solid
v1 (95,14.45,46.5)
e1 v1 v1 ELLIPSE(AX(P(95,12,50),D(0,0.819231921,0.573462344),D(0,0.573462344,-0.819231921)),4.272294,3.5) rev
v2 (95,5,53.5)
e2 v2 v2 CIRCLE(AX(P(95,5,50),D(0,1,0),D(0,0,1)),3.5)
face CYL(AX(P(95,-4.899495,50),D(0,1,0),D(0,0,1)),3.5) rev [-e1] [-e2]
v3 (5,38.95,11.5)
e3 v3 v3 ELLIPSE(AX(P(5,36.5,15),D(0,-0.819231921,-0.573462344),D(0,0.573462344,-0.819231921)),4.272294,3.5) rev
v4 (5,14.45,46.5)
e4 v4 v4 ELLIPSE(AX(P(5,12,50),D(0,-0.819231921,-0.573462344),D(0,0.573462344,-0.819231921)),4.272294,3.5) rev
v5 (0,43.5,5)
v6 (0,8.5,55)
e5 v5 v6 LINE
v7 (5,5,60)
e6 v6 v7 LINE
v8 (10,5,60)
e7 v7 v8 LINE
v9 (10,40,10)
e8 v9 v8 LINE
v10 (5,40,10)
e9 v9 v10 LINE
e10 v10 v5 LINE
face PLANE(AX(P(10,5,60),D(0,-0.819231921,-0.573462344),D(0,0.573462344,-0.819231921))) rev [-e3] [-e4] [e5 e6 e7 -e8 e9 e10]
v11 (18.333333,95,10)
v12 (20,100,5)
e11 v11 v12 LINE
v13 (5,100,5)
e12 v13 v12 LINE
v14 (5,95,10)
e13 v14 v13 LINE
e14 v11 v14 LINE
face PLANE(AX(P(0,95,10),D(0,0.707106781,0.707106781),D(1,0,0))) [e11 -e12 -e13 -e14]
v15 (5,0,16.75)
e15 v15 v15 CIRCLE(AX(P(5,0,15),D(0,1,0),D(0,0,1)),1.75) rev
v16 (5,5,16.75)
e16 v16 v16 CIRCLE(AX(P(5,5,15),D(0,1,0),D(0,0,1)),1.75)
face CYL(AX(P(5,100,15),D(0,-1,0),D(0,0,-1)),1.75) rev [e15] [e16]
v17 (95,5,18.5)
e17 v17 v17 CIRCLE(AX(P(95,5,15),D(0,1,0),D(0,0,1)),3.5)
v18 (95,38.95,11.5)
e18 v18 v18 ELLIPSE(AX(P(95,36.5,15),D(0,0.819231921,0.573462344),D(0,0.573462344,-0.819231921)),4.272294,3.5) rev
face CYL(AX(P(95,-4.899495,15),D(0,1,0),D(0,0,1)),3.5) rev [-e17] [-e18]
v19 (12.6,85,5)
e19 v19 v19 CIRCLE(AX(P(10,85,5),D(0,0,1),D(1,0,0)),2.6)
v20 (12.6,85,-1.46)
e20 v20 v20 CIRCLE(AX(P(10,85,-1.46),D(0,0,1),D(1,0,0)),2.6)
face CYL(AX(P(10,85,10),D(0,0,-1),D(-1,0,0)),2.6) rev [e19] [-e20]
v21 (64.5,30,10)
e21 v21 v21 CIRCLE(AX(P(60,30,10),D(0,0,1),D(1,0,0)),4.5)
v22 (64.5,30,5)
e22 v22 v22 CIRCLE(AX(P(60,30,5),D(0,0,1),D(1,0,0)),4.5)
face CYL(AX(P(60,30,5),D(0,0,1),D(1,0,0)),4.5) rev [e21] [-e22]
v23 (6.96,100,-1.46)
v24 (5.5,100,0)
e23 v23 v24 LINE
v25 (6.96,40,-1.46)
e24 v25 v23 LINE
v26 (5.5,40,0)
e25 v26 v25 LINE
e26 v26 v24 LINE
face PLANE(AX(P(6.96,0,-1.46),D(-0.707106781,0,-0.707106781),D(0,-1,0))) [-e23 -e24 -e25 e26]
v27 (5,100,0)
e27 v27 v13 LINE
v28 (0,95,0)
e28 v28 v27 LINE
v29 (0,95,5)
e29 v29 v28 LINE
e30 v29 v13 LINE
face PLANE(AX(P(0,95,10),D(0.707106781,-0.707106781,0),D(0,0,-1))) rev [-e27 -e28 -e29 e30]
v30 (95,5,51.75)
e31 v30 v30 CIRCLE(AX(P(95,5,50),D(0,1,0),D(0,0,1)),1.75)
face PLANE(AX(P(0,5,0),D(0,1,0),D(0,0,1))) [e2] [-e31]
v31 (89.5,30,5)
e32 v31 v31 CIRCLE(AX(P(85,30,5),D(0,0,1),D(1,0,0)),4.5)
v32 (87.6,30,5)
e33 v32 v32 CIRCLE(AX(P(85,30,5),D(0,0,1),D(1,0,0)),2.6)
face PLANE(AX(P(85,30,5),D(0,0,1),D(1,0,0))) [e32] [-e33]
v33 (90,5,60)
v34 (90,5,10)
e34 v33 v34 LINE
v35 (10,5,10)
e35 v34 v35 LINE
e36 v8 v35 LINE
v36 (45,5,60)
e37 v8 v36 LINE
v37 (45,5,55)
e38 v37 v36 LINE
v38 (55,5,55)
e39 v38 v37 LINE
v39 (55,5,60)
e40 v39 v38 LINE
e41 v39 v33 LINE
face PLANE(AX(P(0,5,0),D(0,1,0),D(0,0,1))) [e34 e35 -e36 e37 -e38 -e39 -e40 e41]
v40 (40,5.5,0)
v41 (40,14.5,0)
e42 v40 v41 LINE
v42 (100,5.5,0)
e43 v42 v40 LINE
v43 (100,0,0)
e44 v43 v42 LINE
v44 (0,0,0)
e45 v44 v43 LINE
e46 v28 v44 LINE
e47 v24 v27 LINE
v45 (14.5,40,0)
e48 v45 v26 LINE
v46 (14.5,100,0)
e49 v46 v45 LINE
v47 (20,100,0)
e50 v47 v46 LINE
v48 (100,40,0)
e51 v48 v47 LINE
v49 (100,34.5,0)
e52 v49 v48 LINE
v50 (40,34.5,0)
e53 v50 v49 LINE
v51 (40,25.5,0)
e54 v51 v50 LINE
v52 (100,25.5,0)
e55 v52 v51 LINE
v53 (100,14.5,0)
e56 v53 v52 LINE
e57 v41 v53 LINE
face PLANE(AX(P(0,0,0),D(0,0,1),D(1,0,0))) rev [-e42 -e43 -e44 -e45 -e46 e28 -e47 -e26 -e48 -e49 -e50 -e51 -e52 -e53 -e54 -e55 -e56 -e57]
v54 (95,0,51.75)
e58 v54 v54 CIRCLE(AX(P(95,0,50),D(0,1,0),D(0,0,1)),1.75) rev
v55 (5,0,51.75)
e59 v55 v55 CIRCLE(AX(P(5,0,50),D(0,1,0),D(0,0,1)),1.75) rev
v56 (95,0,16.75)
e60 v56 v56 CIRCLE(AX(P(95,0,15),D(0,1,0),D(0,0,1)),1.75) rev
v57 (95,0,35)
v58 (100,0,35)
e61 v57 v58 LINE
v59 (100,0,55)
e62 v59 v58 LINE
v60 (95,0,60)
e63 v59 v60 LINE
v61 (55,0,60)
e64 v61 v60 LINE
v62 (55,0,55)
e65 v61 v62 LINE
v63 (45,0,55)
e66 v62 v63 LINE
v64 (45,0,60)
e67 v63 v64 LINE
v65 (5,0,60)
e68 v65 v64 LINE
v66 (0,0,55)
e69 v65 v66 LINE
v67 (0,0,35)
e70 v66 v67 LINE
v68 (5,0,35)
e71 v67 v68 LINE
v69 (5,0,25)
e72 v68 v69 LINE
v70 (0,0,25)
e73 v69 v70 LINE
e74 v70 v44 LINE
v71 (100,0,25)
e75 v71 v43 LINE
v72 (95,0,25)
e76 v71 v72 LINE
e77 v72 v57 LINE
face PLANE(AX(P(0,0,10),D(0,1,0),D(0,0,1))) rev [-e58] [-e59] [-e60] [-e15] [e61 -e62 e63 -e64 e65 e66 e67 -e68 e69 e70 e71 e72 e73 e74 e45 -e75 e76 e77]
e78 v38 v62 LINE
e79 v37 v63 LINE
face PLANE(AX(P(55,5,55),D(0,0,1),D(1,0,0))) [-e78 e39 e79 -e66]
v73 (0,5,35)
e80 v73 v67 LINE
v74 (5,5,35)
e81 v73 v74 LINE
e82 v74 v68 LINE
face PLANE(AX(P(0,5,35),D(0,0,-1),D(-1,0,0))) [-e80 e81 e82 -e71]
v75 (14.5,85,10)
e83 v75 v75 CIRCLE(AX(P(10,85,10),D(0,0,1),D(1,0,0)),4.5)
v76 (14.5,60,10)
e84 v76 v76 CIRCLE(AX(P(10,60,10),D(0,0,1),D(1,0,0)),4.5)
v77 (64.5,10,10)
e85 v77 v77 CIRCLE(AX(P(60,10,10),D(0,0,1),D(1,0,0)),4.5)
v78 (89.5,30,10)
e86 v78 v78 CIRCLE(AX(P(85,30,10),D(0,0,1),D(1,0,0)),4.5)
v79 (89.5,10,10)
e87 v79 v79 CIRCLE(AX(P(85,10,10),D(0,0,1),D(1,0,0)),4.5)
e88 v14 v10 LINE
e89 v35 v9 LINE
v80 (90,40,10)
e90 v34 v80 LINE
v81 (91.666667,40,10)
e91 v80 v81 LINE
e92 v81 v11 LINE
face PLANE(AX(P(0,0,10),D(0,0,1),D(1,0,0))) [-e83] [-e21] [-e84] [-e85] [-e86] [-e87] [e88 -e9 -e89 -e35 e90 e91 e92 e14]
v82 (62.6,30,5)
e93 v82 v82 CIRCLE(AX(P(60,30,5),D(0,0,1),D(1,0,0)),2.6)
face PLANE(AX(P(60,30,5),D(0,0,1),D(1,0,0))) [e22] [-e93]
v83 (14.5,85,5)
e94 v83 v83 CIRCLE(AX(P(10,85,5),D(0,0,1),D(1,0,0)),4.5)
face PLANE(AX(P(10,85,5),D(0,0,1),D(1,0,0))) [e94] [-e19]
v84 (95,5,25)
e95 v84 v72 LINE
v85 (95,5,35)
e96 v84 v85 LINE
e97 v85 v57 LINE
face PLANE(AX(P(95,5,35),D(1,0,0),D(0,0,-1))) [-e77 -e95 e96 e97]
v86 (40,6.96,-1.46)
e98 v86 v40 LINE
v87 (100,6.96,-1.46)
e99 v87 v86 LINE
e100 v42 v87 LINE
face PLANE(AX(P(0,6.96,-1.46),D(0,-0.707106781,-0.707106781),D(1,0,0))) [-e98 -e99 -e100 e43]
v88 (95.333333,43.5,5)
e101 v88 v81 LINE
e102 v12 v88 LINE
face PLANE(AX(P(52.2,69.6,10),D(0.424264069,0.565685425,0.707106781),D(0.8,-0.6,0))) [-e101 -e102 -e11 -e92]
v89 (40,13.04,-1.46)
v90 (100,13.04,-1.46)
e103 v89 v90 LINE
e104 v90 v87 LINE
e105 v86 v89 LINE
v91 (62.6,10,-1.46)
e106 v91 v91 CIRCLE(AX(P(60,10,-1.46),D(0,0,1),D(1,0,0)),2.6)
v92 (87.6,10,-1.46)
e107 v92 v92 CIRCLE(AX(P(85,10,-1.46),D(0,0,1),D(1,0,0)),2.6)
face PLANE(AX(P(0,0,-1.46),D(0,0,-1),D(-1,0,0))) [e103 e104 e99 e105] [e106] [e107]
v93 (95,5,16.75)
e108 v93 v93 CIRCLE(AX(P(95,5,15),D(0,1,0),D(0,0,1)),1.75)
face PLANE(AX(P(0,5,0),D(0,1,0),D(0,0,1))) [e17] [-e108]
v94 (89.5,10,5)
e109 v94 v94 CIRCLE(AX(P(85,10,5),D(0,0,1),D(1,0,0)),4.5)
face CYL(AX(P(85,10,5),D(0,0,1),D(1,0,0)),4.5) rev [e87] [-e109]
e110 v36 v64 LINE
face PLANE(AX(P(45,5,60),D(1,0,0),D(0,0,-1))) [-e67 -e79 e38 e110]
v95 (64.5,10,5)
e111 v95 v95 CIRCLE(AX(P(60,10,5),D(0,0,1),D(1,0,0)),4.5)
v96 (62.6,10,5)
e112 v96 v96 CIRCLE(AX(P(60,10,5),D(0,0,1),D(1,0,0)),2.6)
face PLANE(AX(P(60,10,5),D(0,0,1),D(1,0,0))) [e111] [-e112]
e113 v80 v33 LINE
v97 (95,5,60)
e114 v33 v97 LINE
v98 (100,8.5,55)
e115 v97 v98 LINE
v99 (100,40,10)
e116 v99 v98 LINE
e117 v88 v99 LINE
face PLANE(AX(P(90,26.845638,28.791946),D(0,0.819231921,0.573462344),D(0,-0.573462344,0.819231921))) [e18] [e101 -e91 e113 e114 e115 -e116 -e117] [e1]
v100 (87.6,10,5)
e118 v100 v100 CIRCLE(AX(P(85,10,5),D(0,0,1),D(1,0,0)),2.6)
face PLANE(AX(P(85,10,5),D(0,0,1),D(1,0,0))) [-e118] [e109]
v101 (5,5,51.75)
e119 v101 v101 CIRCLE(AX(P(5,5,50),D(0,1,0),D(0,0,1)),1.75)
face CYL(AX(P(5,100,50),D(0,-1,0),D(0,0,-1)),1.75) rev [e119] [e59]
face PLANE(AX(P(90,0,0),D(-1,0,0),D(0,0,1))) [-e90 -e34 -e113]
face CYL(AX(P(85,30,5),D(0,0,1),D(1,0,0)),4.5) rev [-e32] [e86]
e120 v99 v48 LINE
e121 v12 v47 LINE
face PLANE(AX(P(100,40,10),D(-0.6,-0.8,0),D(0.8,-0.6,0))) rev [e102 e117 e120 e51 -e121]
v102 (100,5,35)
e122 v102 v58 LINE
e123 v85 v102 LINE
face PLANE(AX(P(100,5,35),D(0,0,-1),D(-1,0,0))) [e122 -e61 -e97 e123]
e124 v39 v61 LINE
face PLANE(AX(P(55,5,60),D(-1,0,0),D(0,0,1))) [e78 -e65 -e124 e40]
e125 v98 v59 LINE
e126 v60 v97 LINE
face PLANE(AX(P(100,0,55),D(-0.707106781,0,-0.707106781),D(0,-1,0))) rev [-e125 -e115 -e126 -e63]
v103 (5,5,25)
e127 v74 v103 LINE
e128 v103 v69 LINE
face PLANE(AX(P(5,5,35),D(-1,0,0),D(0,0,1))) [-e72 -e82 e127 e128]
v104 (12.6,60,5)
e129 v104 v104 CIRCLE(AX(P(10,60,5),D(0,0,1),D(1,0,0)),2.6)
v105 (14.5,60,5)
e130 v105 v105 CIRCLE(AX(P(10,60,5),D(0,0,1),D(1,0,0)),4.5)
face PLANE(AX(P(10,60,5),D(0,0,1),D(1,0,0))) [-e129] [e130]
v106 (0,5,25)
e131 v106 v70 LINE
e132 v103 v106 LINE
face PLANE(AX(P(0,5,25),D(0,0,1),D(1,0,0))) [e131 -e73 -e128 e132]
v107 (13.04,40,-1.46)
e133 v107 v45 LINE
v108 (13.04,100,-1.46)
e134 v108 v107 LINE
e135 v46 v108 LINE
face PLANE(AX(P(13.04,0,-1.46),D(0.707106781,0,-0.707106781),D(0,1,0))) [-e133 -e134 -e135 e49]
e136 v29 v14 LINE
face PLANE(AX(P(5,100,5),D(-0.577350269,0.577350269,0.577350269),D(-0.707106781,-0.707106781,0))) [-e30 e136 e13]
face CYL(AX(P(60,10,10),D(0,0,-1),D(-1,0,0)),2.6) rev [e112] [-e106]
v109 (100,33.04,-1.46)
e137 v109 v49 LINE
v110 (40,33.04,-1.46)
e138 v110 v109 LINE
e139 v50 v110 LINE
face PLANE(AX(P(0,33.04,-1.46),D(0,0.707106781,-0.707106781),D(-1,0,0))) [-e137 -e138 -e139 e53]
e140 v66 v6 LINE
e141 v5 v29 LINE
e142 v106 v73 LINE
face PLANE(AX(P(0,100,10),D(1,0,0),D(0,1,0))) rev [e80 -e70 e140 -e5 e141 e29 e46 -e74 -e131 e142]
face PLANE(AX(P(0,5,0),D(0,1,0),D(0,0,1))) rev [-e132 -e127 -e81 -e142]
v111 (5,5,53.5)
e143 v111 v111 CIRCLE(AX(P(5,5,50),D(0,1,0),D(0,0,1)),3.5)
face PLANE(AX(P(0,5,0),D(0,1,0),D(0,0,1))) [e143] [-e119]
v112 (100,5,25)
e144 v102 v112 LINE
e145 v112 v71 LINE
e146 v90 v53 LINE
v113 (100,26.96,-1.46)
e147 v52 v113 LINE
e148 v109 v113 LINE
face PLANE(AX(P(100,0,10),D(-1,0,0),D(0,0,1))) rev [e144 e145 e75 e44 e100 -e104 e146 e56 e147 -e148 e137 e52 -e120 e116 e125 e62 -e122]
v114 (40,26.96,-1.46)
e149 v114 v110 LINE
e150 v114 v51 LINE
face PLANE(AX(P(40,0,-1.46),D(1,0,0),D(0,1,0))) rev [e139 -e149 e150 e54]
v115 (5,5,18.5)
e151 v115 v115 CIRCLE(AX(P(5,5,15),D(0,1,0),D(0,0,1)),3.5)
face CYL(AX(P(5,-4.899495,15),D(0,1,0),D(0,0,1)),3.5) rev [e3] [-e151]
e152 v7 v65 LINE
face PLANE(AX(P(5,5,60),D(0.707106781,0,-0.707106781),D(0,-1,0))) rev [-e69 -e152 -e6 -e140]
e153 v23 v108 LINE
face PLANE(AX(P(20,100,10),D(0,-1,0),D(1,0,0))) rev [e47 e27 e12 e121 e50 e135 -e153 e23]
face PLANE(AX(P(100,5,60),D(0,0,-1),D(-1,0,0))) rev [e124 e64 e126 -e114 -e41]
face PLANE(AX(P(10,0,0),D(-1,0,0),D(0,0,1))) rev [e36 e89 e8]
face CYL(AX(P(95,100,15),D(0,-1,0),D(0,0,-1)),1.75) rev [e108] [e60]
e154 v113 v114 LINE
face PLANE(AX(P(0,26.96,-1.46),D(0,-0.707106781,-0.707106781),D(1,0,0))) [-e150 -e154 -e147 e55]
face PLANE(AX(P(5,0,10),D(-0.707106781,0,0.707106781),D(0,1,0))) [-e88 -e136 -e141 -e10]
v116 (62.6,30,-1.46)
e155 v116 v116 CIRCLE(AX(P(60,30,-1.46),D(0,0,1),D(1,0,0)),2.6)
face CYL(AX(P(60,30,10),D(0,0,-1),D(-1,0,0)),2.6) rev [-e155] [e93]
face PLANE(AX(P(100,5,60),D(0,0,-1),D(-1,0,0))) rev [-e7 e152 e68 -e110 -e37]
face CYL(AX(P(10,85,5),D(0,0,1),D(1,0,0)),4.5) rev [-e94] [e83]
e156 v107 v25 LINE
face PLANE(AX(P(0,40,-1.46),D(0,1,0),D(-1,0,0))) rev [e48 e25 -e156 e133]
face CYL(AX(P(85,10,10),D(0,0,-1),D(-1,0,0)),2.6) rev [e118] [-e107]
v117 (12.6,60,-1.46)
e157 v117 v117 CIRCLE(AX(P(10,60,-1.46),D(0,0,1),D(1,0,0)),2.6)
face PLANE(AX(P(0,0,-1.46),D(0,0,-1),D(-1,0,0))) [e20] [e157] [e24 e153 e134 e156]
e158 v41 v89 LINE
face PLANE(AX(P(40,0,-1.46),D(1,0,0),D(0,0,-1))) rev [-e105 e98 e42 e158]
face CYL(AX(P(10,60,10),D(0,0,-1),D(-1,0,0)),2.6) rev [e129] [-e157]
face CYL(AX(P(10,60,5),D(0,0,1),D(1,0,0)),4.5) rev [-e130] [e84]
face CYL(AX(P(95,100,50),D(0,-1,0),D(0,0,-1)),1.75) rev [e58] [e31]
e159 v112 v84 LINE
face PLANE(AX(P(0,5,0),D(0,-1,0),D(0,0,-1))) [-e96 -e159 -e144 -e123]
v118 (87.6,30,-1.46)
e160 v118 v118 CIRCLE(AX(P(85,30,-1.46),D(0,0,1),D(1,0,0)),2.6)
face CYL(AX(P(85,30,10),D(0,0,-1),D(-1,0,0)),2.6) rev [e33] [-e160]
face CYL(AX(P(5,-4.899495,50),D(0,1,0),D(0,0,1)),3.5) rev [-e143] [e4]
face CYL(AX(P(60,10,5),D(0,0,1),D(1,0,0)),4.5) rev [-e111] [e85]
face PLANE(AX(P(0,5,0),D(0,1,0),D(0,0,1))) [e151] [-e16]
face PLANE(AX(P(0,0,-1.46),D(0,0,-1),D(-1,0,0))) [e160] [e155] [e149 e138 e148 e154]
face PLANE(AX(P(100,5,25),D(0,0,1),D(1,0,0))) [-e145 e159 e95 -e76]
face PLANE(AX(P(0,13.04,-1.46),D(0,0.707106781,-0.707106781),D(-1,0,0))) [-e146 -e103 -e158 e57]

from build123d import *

# Parameters (mm, degrees)
BOSS_EXTRUDE1_DEPTH     = 10
SKETCH2_R               = 2.6
CUT_EXTRUDE1_DEPTH      = 142.774468788
SKETCH3_W               = 60
SKETCH3_H               = 9
SKETCH3_W_2             = 9
SKETCH3_H_2             = 60
BOSS_EXTRUDE3_DEPTH     = 1.46
CUT_EXTRUDE2_DEPTH      = 142.774468788
CUT_EXTRUDE2_DEPTH_BACK = 142.774468788
SKETCH2_2_R             = 2.6
CHAMFER1_SIZE           = 1.46
CUT_EXTRUDE3_START      = 10
SKETCH4_R               = 4.5
CUT_EXTRUDE3_DEPTH      = 5
SKETCH5_W               = 100
SKETCH5_H               = 50
BOSS_EXTRUDE4_DEPTH     = 5
BOSS_EXTRUDE5_DEPTH     = 10
BOSS_EXTRUDE6_START     = 100
BOSS_EXTRUDE6_DEPTH     = 10
CUT_EXTRUDE4_DEPTH      = 154.622914957
CUT_EXTRUDE4_DEPTH_BACK = 154.622914957
SKETCH10_R              = 1.75
CUT_EXTRUDE5_START      = 100
SKETCH11_R              = 3.5
CUT_EXTRUDE5_DEPTH      = 95
SKETCH12_W              = 10
SKETCH12_H              = 5
SKETCH12_W_2            = 5
SKETCH12_H_2            = 10
CUT_EXTRUDE6_DEPTH      = 5
CHAMFER2_SIZE           = 5


# Some blends are built 0.0001 mm under size
with BuildPart() as part:
    # Sketch1 → Boss-Extrude1 (new body)
    with BuildSketch(Plane.XY):
        Polygon((0, 0), (100, 0), (100, 40), (20, 100), (0, 100), align=None)
    extrude(amount=BOSS_EXTRUDE1_DEPTH)

    # Sketch2 → Cut-Extrude1 (cut, through all)
    with BuildSketch(Plane.XY):
        with Locations((10, 85)):
            Circle(SKETCH2_R)
        with Locations((10, 60)):
            Circle(SKETCH2_R)
        with Locations((85, 30)):
            Circle(SKETCH2_R)
        with Locations((85, 10)):
            Circle(SKETCH2_R)
        with Locations((60, 10)):
            Circle(SKETCH2_R)
        with Locations((60, 30)):
            Circle(SKETCH2_R)
    extrude(amount=CUT_EXTRUDE1_DEPTH, mode=Mode.SUBTRACT)

    # Sketch3 → Boss-Extrude3 (add)
    with BuildSketch(Plane.XY):
        with Locations((70, 30)):
            Rectangle(SKETCH3_W, SKETCH3_H)
        with Locations((70, 10)):
            Rectangle(SKETCH3_W, SKETCH3_H)
        with Locations((10, 70)):
            Rectangle(SKETCH3_W_2, SKETCH3_H_2)
    extrude(amount=-BOSS_EXTRUDE3_DEPTH)

    # Sketch2<2> → Cut-Extrude2 (cut, two sides: drawn at the far end of the back side and taken through both)
    with BuildSketch(Plane.XY.offset(-CUT_EXTRUDE2_DEPTH_BACK)):
        with Locations((10, 85)):
            Circle(SKETCH2_2_R)
        with Locations((10, 60)):
            Circle(SKETCH2_2_R)
        with Locations((85, 30)):
            Circle(SKETCH2_2_R)
        with Locations((85, 10)):
            Circle(SKETCH2_2_R)
        with Locations((60, 10)):
            Circle(SKETCH2_2_R)
        with Locations((60, 30)):
            Circle(SKETCH2_2_R)
    extrude(amount=CUT_EXTRUDE2_DEPTH + CUT_EXTRUDE2_DEPTH_BACK, mode=Mode.SUBTRACT)

    # Chamfer1
    chamfer1_edges = [part.edges().sort_by_distance(p)[0] for p in [
        (14.5, 70, -1.46),
        (5.5, 70, -1.46),
        (70, 5.5, -1.46),
        (70, 14.5, -1.46),
        (70, 25.5, -1.46),
        (70, 34.5, -1.46),
    ]]
    chamfer(chamfer1_edges, length=CHAMFER1_SIZE - 0.0001)  # a hair under: the kernel refuses the full size

    # Sketch4 → Cut-Extrude3 (cut)
    with BuildSketch(Plane.XY.offset(CUT_EXTRUDE3_START)):
        with Locations((10, 85)):
            Circle(SKETCH4_R)
        with Locations((10, 60)):
            Circle(SKETCH4_R)
        with Locations((60, 30)):
            Circle(SKETCH4_R)
        with Locations((85, 30)):
            Circle(SKETCH4_R)
        with Locations((85, 10)):
            Circle(SKETCH4_R)
        with Locations((60, 10)):
            Circle(SKETCH4_R)
    extrude(amount=-CUT_EXTRUDE3_DEPTH, mode=Mode.SUBTRACT)

    # Sketch5 → Boss-Extrude4 (add)
    with BuildSketch(Plane(origin=(0, 0, 0), x_dir=(1, 0, 0), z_dir=(0, 1, 0))):
        with Locations((50, -35)):
            Rectangle(SKETCH5_W, SKETCH5_H)
    extrude(amount=BOSS_EXTRUDE4_DEPTH)

    # Sketch8 → Boss-Extrude5 (add)
    with BuildSketch(Plane(origin=(0, 0, 0), x_dir=(0, 0, -1), z_dir=(1, 0, 0))):
        Polygon((-10, 5), (-60, 5), (-10, 40), align=None)
    extrude(amount=BOSS_EXTRUDE5_DEPTH)

    # Sketch8<2> → Boss-Extrude6 (add)
    with BuildSketch(Plane(origin=(0, 0, 0), x_dir=(0, 0, -1), z_dir=(1, 0, 0)).offset(BOSS_EXTRUDE6_START)):
        Polygon((-10, 5), (-60, 5), (-10, 40), align=None)
    extrude(amount=-BOSS_EXTRUDE6_DEPTH)

    # Sketch10 → Cut-Extrude4 (cut, two sides: drawn at the far end of the back side and taken through both)
    with BuildSketch(Plane(origin=(0, 0, 0), x_dir=(1, 0, 0), z_dir=(0, 1, 0)).offset(-CUT_EXTRUDE4_DEPTH_BACK)):
        with Locations(Location((5, -50, 0), (0, 0, 270))):
            Circle(SKETCH10_R)
        with Locations(Location((95, -50, 0), (0, 0, 270))):
            Circle(SKETCH10_R)
        with Locations(Location((95, -15, 0), (0, 0, 270))):
            Circle(SKETCH10_R)
        with Locations(Location((5, -15, 0), (0, 0, 270))):
            Circle(SKETCH10_R)
    extrude(amount=CUT_EXTRUDE4_DEPTH + CUT_EXTRUDE4_DEPTH_BACK, mode=Mode.SUBTRACT)

    # Sketch11 → Cut-Extrude5 (cut)
    with BuildSketch(Plane(origin=(0, 0, 0), x_dir=(1, 0, 0), z_dir=(0, 1, 0)).offset(CUT_EXTRUDE5_START)):
        with Locations(Location((5, -15, 0), (0, 0, 270))):
            Circle(SKETCH11_R)
        with Locations(Location((5, -50, 0), (0, 0, 270))):
            Circle(SKETCH11_R)
        with Locations(Location((95, -50, 0), (0, 0, 270))):
            Circle(SKETCH11_R)
        with Locations(Location((95, -15, 0), (0, 0, 270))):
            Circle(SKETCH11_R)
    extrude(amount=-CUT_EXTRUDE5_DEPTH, mode=Mode.SUBTRACT)

    # Sketch12 → Cut-Extrude6 (cut)
    with BuildSketch(Plane(origin=(0, 0, 0), x_dir=(1, 0, 0), z_dir=(0, 1, 0))):
        with Locations((50, -57.5)):
            Rectangle(SKETCH12_W, SKETCH12_H)
        with Locations((97.5, -30)):
            Rectangle(SKETCH12_W_2, SKETCH12_H_2)
        with Locations((2.5, -30)):
            Rectangle(SKETCH12_W_2, SKETCH12_H_2)
    extrude(amount=CUT_EXTRUDE6_DEPTH, mode=Mode.SUBTRACT)

    # Chamfer2
    # the kernel refuses this chamfer: 5 mm, written as the material it takes off along each edge
    with BuildSketch(Plane(origin=(3.333333333, 96.666666667, 6.666666667), x_dir=(-0.7071067811865474, 0, -0.7071067811865476), z_dir=(-0.5773502691896258, 0.5773502691896257, 0.5773502691896257))) as chamfer2_piece_1:
        Polygon((-3.535533906, 2.041241452), (3.535533906, 2.041241452), (0, -4.082482905), align=None)
    extrude(amount=6.350852961, mode=Mode.SUBTRACT)
    with BuildSketch(Plane(origin=(110.286731952, 32.284951036, 10), x_dir=(0.016497525966350957, 0.021996701288467948, -0.9996219169112968), z_dir=(-0.8000000000000002, 0.6, 0))) as chamfer2_piece_2_section:
        Polygon((CHAMFER2_SIZE * 0.999621916911, CHAMFER2_SIZE * 0.0274958766106), (-CHAMFER2_SIZE * 0.0274958766106, CHAMFER2_SIZE * 0.999621916911), (0, 0), align=None)
    chamfer2_piece_2 = extrude(amount=125.71682988, mode=Mode.PRIVATE)
    chamfer2_piece_2 = split(chamfer2_piece_2, bisect_by=Plane(origin=(56.438385269, 50.830938552, -5.472769359), z_dir=(0, 0.8192319205190406, 0.5734623443633283)), keep=Keep.TOP, mode=Mode.PRIVATE)
    add(chamfer2_piece_2, mode=Mode.SUBTRACT)
    with BuildSketch(Plane(origin=(100, -12.85841494, 60), x_dir=(0.0274958766105877, 0, -0.9996219169112968), z_dir=(0, 1, 0))) as chamfer2_piece_3:
        Polygon((CHAMFER2_SIZE * 0.999621916911, CHAMFER2_SIZE * 0.0274958766106), (-CHAMFER2_SIZE * 0.0274958766106, CHAMFER2_SIZE * 0.999621916911), (0, 0), align=None)
    extrude(amount=30.71682988, mode=Mode.SUBTRACT)
    with BuildSketch(Plane(origin=(0, -12.85841494, 60), x_dir=(-0.027495876610586372, 0, -0.9996219169112968), z_dir=(0, 1, 0))) as chamfer2_piece_4:
        Polygon((CHAMFER2_SIZE * 0.999621916911, -CHAMFER2_SIZE * 0.0274958766106), (-CHAMFER2_SIZE * 0.0274958766106, -CHAMFER2_SIZE * 0.999621916911), (0, 0), align=None)
    extrude(amount=30.71682988, mode=Mode.SUBTRACT)
    with BuildSketch(Plane(origin=(32.85841494, 100, 10), x_dir=(0, 0.0274958766105877, -0.9996219169112968), z_dir=(-1, 0, 0))) as chamfer2_piece_5:
        Polygon((CHAMFER2_SIZE * 0.999621916911, CHAMFER2_SIZE * 0.0274958766106), (-CHAMFER2_SIZE * 0.0274958766106, CHAMFER2_SIZE * 0.999621916911), (0, 0), align=None)
    extrude(amount=45.71682988, mode=Mode.SUBTRACT)
    with BuildSketch(Plane(origin=(0, 112.85841494, 10), x_dir=(-0.02749587661058638, 0, -0.9996219169112968), z_dir=(0, -1, 0))) as chamfer2_piece_6_section:
        Polygon((CHAMFER2_SIZE * 0.999621916911, CHAMFER2_SIZE * 0.0274958766106), (-CHAMFER2_SIZE * 0.0274958766106, CHAMFER2_SIZE * 0.999621916911), (0, 0), align=None)
    chamfer2_piece_6 = extrude(amount=85.71682988, mode=Mode.PRIVATE)
    chamfer2_piece_6 = split(chamfer2_piece_6, bisect_by=Plane(origin=(1.674929178, 50.830938552, -5.472769359), z_dir=(0, 0.8192319205190406, 0.5734623443633283)), keep=Keep.TOP, mode=Mode.PRIVATE)
    add(chamfer2_piece_6, mode=Mode.SUBTRACT)
    with BuildSketch(Plane(origin=(0, 100, -12.85841494), x_dir=(-0.027495876610586313, -0.9996219169112968, 0), z_dir=(0, 0, 1))) as chamfer2_piece_7:
        Polygon((CHAMFER2_SIZE * 0.999621916911, CHAMFER2_SIZE * 0.0274958766106), (-CHAMFER2_SIZE * 0.0274958766106, CHAMFER2_SIZE * 0.999621916911), (0, 0), align=None)
    extrude(amount=35.71682988, mode=Mode.SUBTRACT)


solid = part.part
